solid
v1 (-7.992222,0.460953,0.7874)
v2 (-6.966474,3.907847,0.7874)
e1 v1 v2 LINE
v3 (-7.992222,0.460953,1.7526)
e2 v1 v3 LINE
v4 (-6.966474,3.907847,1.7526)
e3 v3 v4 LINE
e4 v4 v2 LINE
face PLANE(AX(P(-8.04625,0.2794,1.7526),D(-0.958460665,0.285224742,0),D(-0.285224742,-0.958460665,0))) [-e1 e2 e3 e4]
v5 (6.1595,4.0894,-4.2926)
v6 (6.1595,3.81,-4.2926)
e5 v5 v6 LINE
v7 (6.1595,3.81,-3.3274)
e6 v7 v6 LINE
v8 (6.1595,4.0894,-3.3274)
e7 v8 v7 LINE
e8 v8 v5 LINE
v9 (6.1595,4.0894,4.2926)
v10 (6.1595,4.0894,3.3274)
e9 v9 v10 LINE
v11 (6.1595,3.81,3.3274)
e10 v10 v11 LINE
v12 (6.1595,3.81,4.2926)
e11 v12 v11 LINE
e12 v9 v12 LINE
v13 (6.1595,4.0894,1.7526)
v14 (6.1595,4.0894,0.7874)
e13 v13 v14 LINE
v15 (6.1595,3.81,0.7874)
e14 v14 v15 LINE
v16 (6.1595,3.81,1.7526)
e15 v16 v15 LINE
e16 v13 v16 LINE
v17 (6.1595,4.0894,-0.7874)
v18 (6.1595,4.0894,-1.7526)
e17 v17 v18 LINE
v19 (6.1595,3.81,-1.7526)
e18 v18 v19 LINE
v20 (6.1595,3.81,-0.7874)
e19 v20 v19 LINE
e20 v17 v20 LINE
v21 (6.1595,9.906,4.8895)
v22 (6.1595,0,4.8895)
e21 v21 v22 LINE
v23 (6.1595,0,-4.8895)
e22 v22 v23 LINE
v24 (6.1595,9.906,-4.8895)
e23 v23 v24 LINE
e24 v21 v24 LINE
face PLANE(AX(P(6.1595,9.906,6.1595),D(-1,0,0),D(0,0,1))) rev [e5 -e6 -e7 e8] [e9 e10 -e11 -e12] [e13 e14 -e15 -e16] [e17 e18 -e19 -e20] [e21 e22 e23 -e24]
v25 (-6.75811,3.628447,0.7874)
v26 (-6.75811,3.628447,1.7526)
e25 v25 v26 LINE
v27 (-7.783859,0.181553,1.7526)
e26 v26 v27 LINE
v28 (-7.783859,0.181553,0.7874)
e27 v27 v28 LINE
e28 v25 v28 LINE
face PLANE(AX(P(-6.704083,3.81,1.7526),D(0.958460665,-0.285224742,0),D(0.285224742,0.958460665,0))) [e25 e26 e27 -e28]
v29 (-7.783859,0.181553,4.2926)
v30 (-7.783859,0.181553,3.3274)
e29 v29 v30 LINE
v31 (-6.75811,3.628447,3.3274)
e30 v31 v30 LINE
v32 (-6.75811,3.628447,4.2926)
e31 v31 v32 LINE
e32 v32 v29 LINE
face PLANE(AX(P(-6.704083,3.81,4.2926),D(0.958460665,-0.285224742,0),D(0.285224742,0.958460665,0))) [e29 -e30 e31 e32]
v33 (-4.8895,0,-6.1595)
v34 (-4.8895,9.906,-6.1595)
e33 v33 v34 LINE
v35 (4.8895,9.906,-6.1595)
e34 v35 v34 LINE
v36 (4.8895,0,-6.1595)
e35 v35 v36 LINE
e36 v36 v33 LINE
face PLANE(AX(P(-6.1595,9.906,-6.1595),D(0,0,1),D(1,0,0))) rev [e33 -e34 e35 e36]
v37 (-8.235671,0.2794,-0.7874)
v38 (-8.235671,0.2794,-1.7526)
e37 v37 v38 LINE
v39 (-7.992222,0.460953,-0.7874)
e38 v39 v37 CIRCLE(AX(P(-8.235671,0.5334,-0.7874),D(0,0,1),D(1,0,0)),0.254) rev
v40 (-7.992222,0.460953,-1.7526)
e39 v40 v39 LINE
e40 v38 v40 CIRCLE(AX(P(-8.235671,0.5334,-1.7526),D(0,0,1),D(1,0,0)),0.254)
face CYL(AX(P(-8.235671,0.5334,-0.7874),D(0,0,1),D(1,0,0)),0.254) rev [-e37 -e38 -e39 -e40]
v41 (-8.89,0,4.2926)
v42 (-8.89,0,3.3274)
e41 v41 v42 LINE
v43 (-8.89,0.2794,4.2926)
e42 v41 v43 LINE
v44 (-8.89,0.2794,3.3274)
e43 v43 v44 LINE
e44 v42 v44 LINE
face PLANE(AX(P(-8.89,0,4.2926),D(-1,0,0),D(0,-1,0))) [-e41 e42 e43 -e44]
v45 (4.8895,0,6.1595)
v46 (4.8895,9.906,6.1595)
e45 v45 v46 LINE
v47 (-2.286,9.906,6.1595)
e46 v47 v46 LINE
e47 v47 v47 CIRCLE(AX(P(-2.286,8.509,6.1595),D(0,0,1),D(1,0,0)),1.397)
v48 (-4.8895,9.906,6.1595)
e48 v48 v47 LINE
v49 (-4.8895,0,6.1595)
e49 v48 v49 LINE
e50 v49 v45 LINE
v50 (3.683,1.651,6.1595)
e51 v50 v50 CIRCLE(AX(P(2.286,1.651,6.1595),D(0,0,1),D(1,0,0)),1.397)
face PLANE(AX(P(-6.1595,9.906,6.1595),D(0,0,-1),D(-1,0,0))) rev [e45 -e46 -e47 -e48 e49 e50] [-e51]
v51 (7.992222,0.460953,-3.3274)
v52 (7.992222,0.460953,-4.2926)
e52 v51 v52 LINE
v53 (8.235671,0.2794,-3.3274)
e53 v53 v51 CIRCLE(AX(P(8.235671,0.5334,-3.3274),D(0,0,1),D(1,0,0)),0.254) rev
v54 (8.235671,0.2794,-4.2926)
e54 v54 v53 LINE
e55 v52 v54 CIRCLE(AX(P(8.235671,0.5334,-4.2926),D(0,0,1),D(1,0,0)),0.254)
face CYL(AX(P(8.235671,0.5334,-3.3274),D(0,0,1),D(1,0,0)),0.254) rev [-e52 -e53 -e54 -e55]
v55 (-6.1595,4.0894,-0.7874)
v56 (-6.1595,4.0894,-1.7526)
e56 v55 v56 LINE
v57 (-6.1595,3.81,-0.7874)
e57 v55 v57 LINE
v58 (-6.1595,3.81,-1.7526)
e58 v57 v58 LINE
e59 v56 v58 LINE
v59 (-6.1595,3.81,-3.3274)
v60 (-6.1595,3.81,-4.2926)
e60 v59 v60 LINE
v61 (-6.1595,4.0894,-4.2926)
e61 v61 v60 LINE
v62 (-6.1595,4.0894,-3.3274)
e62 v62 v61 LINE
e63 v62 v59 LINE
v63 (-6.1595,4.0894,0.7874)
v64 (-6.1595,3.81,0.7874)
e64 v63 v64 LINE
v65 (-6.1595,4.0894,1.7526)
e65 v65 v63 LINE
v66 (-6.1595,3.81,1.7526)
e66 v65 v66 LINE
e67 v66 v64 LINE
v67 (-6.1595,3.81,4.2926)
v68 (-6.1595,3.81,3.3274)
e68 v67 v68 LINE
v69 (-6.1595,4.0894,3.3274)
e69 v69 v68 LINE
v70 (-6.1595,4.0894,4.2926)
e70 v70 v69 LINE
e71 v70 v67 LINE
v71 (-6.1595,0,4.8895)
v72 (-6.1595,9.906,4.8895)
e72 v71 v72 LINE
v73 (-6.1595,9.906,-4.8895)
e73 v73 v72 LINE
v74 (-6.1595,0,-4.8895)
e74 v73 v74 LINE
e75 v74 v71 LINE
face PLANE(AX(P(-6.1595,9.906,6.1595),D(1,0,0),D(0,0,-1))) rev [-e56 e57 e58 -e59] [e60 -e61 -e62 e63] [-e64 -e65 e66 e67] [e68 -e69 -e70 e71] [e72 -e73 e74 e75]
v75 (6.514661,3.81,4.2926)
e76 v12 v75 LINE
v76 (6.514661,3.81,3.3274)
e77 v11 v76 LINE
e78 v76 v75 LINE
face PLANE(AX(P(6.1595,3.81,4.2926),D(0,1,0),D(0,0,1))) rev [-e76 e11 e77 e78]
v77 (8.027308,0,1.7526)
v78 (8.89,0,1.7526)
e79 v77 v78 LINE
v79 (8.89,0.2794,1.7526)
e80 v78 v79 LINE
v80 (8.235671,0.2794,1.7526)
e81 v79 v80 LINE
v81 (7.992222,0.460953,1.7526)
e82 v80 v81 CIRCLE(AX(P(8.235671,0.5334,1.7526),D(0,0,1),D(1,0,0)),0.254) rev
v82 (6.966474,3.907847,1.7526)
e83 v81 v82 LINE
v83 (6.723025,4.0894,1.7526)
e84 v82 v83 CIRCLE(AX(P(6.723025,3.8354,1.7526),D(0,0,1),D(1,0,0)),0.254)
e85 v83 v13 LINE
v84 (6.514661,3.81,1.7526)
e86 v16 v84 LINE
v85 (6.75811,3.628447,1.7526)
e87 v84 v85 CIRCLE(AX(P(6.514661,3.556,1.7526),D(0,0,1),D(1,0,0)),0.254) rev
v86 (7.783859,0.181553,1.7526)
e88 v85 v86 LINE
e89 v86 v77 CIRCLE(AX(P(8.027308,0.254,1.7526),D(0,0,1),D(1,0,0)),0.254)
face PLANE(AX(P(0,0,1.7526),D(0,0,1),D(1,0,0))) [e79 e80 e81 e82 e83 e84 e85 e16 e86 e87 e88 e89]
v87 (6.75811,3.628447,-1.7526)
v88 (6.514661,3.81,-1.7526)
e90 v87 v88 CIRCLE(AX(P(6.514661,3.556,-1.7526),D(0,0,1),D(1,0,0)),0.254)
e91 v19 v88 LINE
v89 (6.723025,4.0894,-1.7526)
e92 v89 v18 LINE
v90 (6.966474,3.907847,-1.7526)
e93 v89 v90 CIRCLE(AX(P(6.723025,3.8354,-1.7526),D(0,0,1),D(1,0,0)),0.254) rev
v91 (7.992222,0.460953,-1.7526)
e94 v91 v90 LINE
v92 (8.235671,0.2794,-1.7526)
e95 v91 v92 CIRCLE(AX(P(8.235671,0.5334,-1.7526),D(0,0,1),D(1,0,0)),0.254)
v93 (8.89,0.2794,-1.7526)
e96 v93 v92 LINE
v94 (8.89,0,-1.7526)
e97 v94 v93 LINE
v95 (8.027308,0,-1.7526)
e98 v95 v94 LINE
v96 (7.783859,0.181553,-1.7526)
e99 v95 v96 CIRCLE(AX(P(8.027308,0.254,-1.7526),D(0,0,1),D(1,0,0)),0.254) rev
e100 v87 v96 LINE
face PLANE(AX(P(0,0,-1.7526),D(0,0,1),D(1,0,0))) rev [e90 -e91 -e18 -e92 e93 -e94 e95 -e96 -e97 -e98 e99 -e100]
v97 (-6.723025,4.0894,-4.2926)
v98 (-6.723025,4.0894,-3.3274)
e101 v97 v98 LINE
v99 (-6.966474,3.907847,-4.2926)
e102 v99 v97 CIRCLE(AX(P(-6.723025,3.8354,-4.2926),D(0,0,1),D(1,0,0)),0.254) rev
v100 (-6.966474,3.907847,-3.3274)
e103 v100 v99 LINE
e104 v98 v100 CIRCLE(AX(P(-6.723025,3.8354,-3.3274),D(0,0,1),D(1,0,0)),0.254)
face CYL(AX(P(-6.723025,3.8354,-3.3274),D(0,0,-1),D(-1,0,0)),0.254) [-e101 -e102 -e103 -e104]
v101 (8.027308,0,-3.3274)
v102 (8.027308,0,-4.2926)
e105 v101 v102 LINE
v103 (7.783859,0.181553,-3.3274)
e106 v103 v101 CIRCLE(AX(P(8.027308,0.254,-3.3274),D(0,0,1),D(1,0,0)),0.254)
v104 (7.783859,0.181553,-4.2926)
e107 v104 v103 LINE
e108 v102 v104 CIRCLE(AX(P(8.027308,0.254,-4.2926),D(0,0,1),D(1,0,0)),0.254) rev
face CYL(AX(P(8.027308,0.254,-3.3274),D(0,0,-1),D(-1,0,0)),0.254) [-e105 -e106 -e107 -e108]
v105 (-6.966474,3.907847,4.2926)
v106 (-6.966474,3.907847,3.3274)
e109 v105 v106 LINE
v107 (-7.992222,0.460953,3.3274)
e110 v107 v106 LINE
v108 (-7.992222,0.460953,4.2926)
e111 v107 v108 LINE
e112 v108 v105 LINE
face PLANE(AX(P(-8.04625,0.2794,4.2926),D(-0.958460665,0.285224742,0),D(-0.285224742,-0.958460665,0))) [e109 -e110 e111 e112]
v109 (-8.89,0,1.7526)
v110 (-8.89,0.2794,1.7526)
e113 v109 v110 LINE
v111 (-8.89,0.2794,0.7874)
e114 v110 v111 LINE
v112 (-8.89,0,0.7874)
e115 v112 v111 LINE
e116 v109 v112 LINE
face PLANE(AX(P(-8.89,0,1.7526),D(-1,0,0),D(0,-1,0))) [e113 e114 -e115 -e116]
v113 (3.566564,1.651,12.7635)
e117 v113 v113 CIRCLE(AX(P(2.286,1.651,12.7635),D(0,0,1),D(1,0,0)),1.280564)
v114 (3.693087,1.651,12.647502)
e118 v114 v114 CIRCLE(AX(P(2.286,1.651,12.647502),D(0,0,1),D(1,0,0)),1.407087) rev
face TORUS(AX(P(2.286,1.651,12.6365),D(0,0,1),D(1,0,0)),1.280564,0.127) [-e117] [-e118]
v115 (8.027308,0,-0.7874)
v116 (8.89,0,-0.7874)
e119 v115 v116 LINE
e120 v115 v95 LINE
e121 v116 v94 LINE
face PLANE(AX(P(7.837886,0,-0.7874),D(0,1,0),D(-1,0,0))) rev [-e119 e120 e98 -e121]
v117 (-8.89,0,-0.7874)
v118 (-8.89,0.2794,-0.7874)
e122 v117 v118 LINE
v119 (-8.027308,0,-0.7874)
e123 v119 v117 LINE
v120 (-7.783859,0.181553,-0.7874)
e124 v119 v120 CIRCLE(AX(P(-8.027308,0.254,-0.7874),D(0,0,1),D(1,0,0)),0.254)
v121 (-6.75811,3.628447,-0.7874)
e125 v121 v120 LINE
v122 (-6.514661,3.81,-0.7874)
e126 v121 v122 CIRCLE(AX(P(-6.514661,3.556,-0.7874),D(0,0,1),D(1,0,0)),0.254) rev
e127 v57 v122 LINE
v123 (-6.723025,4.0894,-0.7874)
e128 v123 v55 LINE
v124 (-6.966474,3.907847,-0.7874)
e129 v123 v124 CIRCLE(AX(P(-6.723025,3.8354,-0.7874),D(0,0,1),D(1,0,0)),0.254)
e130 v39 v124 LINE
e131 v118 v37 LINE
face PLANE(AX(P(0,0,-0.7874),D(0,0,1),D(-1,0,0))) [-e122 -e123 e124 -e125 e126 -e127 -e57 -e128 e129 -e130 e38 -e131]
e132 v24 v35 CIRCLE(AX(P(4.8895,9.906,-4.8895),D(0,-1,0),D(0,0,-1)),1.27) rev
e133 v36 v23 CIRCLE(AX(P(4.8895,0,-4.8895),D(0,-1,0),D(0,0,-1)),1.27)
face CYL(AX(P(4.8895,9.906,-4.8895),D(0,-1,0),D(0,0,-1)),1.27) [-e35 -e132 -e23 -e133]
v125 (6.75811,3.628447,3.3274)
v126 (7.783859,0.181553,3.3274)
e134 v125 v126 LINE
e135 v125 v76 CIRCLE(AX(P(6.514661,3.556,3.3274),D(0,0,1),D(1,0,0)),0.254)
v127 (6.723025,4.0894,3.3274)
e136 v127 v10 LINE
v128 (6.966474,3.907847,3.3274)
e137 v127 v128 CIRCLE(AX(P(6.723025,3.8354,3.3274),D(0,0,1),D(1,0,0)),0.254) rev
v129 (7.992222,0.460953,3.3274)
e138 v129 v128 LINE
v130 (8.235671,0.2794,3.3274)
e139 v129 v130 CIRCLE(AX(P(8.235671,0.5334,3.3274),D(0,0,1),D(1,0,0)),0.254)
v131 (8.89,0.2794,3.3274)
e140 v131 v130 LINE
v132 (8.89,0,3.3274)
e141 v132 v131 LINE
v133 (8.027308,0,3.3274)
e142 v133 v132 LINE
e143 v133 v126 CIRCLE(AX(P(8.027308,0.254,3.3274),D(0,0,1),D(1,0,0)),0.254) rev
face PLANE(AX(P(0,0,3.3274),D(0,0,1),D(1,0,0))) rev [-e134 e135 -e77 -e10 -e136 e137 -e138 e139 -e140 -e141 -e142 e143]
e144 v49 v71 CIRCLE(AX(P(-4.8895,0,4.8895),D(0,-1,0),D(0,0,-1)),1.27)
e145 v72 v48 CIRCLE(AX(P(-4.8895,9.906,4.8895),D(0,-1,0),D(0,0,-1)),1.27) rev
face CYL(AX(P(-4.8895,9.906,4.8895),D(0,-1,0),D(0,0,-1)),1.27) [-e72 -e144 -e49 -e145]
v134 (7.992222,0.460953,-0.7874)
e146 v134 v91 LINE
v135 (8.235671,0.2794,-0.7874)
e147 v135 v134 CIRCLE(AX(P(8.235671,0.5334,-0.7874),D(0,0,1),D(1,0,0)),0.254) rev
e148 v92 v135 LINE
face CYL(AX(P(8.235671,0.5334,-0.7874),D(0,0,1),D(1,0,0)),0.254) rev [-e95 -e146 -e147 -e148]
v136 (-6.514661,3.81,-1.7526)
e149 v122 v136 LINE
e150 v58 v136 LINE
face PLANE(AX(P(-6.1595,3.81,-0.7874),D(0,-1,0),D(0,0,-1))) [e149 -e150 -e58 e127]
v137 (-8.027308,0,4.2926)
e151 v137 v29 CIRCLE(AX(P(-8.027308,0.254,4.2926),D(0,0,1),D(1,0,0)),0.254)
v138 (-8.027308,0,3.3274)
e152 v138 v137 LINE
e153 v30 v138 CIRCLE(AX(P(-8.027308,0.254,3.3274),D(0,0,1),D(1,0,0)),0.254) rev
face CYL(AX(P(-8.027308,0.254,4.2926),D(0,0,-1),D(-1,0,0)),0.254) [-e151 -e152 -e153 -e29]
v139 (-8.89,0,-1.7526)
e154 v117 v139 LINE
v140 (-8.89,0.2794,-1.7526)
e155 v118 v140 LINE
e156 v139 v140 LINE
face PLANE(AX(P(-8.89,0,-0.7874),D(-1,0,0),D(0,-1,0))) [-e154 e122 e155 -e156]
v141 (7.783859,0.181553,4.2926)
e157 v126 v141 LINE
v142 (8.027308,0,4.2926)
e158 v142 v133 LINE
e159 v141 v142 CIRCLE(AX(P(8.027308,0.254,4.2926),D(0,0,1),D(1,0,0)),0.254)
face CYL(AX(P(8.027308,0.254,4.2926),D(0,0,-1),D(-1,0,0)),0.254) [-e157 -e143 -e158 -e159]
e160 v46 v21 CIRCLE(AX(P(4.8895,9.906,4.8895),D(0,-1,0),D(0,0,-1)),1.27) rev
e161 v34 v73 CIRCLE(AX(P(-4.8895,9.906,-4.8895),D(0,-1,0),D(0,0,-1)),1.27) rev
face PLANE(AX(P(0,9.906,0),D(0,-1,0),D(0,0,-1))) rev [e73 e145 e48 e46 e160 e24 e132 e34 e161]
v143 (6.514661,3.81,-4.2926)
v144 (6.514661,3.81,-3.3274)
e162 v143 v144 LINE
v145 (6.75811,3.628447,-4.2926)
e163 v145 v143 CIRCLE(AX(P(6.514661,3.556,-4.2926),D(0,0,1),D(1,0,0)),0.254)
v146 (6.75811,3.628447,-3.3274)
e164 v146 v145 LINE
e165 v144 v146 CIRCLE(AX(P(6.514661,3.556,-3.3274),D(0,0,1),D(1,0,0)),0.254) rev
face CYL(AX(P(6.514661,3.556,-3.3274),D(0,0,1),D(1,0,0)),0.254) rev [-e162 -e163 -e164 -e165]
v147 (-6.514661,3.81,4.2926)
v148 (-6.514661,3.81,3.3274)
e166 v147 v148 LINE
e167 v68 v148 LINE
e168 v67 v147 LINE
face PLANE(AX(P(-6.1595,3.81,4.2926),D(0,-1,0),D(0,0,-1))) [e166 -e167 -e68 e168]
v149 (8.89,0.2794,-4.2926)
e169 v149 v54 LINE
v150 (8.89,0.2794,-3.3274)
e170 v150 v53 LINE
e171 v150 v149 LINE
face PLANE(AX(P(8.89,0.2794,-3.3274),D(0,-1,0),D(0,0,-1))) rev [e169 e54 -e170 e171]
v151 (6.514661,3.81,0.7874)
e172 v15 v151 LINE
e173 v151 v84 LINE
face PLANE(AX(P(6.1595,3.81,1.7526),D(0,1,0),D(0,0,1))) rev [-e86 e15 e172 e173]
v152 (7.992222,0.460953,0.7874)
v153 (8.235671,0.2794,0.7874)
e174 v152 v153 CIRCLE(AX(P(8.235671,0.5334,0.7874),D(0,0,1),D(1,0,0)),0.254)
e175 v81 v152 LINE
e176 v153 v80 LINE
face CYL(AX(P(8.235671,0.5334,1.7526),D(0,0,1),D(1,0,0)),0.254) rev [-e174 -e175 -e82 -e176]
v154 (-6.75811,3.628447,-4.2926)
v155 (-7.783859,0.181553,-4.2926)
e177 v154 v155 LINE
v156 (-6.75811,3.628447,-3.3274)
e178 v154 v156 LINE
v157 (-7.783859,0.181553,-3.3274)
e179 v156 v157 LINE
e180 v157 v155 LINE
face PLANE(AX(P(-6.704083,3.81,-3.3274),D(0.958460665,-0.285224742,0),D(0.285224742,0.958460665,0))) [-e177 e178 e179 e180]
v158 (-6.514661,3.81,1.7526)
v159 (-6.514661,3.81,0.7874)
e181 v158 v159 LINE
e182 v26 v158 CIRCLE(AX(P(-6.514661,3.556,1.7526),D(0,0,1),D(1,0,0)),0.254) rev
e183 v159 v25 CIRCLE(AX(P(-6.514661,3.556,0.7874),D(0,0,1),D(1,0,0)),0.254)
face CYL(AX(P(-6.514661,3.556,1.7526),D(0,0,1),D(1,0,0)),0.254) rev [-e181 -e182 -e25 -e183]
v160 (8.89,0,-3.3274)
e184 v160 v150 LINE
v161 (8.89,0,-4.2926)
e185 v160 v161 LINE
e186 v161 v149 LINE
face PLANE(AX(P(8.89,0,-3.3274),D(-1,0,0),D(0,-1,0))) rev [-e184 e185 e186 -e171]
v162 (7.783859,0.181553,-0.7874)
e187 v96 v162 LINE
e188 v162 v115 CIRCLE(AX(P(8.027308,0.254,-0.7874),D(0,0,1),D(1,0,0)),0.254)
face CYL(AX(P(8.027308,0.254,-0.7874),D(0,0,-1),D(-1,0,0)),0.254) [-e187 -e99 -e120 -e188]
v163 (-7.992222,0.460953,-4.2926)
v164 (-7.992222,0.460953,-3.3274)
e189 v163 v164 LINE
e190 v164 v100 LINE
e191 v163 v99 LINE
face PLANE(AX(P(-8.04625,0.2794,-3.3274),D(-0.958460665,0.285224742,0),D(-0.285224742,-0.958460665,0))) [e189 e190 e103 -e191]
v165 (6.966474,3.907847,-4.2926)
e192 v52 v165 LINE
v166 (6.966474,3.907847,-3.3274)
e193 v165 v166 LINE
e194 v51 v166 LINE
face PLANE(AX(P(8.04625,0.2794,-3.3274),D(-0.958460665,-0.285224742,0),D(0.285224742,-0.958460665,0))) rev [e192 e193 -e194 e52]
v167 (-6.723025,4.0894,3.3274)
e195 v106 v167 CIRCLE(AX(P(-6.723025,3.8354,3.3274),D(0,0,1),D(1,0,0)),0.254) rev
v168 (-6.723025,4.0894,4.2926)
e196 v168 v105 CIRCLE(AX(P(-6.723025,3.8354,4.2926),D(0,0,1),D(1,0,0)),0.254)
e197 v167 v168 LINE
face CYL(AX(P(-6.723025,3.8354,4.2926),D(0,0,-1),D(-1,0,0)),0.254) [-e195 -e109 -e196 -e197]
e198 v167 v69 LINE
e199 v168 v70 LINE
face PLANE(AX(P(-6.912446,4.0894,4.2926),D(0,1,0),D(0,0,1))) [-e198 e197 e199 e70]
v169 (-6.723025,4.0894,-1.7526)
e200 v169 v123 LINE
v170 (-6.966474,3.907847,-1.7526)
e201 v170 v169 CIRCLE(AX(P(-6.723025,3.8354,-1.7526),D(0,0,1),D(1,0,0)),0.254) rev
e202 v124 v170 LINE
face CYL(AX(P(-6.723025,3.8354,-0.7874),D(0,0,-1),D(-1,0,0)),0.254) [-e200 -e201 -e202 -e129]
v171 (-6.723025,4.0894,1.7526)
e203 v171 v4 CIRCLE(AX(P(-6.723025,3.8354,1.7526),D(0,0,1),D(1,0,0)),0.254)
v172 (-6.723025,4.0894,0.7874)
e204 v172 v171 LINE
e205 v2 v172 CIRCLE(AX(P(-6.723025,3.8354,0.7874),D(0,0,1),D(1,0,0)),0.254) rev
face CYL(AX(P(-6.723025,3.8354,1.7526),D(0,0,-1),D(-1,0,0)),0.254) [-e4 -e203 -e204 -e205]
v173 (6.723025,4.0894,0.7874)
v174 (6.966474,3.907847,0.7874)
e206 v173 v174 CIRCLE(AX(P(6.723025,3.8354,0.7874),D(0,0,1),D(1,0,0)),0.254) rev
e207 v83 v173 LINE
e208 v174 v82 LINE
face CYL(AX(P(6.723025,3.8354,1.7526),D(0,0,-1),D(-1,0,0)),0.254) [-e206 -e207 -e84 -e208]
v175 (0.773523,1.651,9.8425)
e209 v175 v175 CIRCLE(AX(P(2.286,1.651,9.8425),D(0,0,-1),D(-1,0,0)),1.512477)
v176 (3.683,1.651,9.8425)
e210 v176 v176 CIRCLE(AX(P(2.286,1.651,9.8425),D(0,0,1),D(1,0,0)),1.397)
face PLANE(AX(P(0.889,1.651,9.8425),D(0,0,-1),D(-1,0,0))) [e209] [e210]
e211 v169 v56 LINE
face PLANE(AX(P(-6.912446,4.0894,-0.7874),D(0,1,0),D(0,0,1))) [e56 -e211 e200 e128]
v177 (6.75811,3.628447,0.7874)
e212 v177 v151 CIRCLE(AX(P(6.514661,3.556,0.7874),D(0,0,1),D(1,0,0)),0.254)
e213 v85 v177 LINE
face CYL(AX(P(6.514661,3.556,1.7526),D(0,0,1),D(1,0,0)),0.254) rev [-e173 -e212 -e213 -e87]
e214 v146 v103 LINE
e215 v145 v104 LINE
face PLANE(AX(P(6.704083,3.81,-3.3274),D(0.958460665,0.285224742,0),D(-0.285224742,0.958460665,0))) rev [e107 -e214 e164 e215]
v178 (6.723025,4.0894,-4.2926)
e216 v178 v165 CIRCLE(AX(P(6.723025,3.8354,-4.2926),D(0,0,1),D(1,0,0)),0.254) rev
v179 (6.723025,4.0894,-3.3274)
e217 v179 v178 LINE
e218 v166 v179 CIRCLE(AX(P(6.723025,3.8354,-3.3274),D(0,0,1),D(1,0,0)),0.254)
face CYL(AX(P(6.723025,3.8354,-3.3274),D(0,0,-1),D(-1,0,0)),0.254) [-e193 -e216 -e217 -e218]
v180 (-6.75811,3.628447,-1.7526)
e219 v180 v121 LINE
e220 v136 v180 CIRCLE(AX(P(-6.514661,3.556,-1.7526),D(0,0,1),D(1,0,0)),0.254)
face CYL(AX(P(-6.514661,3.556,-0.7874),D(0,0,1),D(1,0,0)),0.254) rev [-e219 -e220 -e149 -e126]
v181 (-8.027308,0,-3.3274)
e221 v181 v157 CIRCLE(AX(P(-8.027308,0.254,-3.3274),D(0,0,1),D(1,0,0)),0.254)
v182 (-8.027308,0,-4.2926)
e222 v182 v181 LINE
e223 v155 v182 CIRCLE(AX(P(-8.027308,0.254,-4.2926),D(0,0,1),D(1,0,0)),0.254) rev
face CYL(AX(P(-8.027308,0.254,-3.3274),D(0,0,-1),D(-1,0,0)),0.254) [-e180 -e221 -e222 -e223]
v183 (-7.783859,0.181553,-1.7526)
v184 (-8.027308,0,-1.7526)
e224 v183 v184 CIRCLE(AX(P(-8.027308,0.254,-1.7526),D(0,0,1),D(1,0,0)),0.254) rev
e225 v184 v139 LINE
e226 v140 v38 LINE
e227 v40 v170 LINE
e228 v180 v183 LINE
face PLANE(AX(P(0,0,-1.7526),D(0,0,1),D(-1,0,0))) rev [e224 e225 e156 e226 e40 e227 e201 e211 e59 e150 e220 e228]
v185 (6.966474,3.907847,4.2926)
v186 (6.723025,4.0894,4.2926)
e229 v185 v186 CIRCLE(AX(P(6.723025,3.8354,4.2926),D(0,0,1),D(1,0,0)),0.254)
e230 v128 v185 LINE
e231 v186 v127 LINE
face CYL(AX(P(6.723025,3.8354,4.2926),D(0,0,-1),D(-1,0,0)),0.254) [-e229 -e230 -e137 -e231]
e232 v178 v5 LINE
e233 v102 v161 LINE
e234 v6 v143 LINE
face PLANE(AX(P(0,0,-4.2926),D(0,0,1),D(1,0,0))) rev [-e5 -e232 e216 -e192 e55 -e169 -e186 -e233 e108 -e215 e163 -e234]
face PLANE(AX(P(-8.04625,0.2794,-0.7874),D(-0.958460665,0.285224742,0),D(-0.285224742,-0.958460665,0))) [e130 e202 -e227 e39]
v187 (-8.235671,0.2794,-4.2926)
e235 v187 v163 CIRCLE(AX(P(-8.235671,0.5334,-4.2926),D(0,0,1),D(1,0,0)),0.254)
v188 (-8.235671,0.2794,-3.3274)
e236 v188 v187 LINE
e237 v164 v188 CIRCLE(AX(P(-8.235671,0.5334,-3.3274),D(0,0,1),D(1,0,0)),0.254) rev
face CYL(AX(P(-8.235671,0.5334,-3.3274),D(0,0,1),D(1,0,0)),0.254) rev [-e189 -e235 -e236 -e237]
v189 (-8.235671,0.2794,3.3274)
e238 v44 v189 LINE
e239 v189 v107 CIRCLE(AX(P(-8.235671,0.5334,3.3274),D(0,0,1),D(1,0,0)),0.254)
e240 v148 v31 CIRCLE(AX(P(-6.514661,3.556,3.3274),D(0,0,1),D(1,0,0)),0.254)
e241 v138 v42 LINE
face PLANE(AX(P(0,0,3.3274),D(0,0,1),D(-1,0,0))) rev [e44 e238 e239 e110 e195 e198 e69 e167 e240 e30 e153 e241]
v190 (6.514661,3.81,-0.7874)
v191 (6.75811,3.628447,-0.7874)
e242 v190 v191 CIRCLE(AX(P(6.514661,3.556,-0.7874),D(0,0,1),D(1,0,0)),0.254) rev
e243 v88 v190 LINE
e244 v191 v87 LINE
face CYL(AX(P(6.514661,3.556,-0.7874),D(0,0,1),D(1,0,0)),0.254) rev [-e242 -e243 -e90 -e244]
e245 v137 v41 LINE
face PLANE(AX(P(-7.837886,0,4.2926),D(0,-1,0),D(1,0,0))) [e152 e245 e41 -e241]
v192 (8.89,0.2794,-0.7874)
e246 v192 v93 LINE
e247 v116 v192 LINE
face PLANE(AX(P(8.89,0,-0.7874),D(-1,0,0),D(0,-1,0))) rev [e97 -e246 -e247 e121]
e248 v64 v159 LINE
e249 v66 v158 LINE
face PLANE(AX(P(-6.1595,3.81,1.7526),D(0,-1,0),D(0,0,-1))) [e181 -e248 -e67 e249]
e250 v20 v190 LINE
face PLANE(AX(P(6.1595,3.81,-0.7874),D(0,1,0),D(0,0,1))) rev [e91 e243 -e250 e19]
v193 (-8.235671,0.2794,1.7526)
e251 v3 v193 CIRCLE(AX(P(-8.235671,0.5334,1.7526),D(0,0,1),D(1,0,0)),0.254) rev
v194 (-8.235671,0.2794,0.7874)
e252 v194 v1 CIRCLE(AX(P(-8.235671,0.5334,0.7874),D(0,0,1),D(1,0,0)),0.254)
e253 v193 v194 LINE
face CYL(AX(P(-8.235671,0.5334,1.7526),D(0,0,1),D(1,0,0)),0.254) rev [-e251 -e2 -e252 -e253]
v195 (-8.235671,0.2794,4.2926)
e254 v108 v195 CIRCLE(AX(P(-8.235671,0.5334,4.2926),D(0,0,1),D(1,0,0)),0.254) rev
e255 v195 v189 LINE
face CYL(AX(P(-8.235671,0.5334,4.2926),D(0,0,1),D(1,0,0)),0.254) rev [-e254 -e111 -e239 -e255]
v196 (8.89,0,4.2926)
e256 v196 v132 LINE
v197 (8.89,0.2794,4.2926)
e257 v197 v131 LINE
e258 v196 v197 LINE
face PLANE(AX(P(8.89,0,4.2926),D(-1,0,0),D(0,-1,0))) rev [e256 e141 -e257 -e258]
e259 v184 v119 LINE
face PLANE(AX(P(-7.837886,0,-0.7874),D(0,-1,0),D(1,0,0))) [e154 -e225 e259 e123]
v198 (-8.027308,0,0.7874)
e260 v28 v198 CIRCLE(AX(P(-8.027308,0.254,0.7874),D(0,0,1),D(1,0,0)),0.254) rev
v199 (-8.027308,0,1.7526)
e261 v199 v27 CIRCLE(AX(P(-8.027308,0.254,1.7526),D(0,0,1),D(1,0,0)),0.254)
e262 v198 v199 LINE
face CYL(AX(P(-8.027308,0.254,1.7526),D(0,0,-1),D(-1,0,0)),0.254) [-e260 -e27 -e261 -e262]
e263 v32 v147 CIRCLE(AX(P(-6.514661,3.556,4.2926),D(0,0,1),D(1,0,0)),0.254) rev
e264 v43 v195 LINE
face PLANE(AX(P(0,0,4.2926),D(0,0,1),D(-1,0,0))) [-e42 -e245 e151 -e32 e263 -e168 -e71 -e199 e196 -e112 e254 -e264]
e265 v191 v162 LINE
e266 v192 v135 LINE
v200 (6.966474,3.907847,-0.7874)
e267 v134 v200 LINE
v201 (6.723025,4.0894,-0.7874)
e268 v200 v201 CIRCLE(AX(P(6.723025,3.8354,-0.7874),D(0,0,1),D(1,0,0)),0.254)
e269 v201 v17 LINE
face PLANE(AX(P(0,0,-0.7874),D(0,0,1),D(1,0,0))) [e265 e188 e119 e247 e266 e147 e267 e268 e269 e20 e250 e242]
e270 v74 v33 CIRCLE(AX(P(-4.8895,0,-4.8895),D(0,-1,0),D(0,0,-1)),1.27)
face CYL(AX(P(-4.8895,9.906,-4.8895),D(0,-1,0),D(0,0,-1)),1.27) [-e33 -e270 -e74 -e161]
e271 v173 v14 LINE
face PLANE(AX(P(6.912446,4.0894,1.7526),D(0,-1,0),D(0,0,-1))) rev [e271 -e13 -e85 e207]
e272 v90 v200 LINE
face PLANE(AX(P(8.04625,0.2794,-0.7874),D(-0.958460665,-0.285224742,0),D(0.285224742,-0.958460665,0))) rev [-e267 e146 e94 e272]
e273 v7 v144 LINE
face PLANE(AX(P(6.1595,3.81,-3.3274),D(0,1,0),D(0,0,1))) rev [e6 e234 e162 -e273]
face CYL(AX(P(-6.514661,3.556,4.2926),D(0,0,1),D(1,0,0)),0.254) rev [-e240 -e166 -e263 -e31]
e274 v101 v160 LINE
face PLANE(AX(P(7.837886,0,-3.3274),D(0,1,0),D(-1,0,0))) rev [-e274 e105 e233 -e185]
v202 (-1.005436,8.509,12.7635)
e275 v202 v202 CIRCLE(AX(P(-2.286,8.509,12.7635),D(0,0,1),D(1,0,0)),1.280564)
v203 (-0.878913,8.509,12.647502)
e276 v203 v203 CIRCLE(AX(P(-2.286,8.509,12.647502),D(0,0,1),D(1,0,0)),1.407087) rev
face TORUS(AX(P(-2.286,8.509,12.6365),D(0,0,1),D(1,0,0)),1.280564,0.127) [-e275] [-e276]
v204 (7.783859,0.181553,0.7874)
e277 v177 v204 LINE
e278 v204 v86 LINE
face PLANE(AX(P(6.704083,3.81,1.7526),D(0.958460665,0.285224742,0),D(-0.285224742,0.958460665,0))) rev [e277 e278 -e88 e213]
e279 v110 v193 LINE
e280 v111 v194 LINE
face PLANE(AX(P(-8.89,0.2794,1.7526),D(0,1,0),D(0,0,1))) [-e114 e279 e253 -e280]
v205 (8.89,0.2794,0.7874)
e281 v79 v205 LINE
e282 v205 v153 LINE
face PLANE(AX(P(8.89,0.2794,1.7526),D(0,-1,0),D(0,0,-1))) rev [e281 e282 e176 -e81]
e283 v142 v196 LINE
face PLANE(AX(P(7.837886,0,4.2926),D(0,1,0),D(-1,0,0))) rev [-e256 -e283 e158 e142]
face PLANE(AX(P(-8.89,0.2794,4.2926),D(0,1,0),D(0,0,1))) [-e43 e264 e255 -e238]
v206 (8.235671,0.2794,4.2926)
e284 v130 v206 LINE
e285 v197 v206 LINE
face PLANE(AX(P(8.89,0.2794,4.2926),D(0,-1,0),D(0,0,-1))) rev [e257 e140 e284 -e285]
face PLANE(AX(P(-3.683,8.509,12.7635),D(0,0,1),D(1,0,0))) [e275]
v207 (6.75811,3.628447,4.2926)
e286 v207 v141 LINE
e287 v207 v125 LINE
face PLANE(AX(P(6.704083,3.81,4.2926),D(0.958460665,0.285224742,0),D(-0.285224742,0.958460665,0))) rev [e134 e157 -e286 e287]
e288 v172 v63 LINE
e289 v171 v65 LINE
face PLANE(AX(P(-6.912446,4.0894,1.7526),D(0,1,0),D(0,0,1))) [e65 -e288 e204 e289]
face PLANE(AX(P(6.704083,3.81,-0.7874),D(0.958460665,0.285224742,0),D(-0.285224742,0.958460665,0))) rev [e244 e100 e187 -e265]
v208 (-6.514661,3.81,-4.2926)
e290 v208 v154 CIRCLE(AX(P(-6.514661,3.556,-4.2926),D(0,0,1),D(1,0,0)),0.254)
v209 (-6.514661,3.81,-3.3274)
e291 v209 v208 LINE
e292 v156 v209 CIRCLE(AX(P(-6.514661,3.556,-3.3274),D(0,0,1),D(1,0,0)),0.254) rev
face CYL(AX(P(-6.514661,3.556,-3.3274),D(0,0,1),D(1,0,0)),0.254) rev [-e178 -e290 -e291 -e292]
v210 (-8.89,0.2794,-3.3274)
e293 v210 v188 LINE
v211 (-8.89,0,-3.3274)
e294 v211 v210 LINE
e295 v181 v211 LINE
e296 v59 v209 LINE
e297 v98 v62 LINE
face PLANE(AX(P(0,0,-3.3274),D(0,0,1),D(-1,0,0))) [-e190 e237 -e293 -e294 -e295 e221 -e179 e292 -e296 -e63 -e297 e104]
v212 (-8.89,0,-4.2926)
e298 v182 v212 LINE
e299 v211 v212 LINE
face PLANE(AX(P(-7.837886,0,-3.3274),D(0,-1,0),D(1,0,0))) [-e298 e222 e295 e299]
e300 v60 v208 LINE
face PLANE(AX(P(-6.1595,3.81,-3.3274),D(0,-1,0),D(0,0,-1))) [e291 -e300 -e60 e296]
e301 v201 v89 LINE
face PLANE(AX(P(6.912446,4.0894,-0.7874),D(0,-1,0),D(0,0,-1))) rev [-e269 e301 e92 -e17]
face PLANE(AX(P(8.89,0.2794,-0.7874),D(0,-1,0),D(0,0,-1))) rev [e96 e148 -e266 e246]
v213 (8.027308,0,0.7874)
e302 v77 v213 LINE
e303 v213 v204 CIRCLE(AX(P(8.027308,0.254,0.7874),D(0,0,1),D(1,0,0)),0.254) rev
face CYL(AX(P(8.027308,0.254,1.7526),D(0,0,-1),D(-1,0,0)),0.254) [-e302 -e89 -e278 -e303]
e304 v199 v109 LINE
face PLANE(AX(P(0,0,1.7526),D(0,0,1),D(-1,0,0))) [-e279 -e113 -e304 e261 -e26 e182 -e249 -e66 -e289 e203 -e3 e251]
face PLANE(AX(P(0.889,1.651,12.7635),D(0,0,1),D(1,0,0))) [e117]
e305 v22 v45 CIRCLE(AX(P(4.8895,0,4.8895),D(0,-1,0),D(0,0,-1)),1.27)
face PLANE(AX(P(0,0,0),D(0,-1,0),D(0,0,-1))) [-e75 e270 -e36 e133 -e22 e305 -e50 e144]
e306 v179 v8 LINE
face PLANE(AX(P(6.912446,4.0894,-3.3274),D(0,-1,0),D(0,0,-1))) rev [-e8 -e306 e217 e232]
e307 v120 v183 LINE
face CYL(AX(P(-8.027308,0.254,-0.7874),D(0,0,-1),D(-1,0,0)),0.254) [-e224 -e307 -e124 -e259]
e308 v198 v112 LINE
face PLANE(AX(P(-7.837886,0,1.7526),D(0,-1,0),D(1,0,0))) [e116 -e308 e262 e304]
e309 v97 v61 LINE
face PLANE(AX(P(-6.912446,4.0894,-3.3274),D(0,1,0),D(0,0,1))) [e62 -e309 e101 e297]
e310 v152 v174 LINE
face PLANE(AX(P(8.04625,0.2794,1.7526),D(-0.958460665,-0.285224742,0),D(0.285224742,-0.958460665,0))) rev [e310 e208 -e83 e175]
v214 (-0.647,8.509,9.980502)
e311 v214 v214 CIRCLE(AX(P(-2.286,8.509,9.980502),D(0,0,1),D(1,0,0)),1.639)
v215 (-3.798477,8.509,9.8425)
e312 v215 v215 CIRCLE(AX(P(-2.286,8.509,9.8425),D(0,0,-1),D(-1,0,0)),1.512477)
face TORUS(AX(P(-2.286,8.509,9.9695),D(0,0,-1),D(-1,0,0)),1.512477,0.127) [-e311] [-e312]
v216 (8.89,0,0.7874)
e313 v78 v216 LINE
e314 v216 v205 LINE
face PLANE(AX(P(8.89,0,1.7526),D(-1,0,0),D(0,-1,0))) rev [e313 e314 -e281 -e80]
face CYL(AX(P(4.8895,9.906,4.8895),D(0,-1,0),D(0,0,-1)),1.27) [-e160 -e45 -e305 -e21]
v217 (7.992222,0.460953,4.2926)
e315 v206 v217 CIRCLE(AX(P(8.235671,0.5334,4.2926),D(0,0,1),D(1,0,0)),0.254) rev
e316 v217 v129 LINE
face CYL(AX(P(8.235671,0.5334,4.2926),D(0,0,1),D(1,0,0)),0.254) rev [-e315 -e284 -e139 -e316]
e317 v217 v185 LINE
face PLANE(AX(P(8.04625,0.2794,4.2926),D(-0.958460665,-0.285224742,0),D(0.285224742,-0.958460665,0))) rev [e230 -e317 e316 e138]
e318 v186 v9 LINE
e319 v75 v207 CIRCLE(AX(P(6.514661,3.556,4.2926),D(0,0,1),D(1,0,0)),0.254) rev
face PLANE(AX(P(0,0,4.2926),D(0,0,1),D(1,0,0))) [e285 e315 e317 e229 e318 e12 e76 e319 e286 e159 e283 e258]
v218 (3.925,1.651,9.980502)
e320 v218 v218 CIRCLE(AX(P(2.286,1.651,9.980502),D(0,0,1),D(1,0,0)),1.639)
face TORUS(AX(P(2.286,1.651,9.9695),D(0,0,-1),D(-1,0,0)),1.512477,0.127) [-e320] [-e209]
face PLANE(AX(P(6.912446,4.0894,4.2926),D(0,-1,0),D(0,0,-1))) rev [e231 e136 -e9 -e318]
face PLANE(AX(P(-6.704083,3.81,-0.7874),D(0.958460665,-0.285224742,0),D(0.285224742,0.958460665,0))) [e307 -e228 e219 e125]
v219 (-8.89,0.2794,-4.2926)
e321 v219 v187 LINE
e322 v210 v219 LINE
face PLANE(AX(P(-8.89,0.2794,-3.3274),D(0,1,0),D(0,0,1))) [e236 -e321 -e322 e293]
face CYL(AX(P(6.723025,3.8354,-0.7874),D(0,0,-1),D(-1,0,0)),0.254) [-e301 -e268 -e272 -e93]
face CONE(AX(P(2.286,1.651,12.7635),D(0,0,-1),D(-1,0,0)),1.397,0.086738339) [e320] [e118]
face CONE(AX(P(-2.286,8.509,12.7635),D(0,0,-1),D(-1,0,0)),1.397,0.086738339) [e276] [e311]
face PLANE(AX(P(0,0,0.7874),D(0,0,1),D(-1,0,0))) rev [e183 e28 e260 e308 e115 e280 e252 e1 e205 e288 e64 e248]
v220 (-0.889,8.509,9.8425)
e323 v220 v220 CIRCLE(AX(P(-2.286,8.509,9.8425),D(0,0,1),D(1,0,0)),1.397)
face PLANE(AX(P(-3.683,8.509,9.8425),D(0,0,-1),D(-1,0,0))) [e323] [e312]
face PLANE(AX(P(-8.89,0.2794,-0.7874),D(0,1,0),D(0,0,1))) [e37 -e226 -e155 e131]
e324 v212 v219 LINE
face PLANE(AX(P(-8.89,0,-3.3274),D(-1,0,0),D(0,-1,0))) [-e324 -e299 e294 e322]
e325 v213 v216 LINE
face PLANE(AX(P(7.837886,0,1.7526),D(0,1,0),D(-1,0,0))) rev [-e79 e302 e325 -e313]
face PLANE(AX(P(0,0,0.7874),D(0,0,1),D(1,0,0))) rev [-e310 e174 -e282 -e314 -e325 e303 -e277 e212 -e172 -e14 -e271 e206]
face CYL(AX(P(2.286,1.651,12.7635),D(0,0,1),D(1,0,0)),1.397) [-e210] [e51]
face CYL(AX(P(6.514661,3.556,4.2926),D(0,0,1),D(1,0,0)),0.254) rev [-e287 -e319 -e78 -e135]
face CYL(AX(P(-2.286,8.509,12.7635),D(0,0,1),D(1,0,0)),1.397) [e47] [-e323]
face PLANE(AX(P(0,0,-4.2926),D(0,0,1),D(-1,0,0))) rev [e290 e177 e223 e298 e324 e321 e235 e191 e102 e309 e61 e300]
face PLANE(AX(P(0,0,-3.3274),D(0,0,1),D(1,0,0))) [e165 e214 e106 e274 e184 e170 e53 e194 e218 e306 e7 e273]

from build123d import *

# Parameters (mm, degrees)
SKETCH1_W              = 12.319
SKETCH1_H              = 12.319
BOSS_EXTRUDE1_DEPTH    = 9.906
FILLET1_R              = 0.127
FILLET2_R              = 1.27
LPATTERN2_COUNT        = 2
LPATTERN2_PITCH        = 4.572
LPATTERN2_COUNT_DIR2   = 2
LPATTERN2_PITCH_DIR2   = 6.858
FILLET1_OF_LPATTERN2_R = 0.127
BOSS_EXTRUDE2_DEPTH    = 0.4826
FILLET3_R              = 0.254
LPATTERN5_COUNT        = 4
LPATTERN5_PITCH        = 2.54
FILLET3_OF_LPATTERN5_R = 0.254
MIRROR1_START          = -4.2926
MIRROR1_DEPTH          = 0.9652
MIRROR1_START_2        = -1.7526
MIRROR1_2_DEPTH        = 0.9652
MIRROR1_START_3        = 0.7874
MIRROR1_3_DEPTH        = 0.9652
MIRROR1_START_4        = 3.3274
MIRROR1_4_DEPTH        = 0.9652


# Read off the part's stored shape, not the designer's step: Mirror1
with BuildPart() as part:
    # Sketch1 → Boss-Extrude1 (new body)
    with BuildSketch(Plane(origin=(0, 0, 0), x_dir=(1, 0, 0), z_dir=(0, 1, 0))):
        Rectangle(SKETCH1_W, SKETCH1_H)
    extrude(amount=BOSS_EXTRUDE1_DEPTH)

    # Sketch3 → Revolve1 (revolve)
    with BuildSketch(Plane.XZ.offset(-8.509), mode=Mode.PRIVATE) as revolve1_sk:
        Polygon((-3.683, 6.1595), (-3.683, 9.8425), (-3.937, 9.8425), (-3.683, 12.7635), (-2.286, 12.7635), (-2.286, 6.1595), align=None)
    revolve1 = revolve(revolve1_sk.sketch.rotate(Axis((-2.286, 8.509, 12.7635), (0, 0, -1)), 180), axis=Axis((-2.286, 8.509, 12.7635), (0, 0, -1)))

    # Fillet1
    fillet1_edges = [part.edges().sort_by_distance(p)[0] for p in [
        (-3.937, 8.509, 9.8425),
        (-3.683, 8.509, 12.7635),
    ]]
    fillet(fillet1_edges, radius=FILLET1_R)

    # Fillet2
    fillet2_edges = [part.edges().sort_by_distance(p)[0] for p in [
        (6.1595, 4.953, 6.1595),
        (-6.1595, 4.953, 6.1595),
        (-6.1595, 4.953, -6.1595),
        (6.1595, 4.953, -6.1595),
    ]]
    fillet(fillet2_edges, radius=FILLET2_R)

    # LPattern2: Revolve1 2 × 2, 2 skipped
    with Locations(*[(i * LPATTERN2_PITCH, -j * LPATTERN2_PITCH_DIR2, 0) for i in range(LPATTERN2_COUNT) for j in range(LPATTERN2_COUNT_DIR2) if (i, j) not in ((0, 0), (0, 1), (1, 0))]):
        add(revolve1)

    # Fillet1 of LPattern2
    fillet1_of_lpattern2_edges = [part.edges().sort_by_distance(p)[0] for p in [
        (0.635, 1.651, 9.8425),
        (0.889, 1.651, 12.7635),
    ]]
    fillet(fillet1_of_lpattern2_edges, radius=FILLET1_OF_LPATTERN2_R)

    # Sketch5 → Boss-Extrude2 (add, symmetric)
    with BuildSketch(Plane(origin=(0, 0, 3.81), x_dir=(0, -1, 0), z_dir=(0, 0, 1))):
        Polygon((-3.81, 6.1595), (-3.81, 6.70408255), (0, 7.837886271), (0, 8.89), (-0.2794, 8.89), (-0.2794, 8.046249759), (-4.0894, 6.912446038), (-4.0894, 6.1595), align=None)
    boss_extrude2 = extrude(amount=BOSS_EXTRUDE2_DEPTH, both=True)

    # Fillet3
    fillet3_edges = [part.edges().sort_by_distance(p)[0] for p in [
        (6.70408255, 3.81, 3.81),
        (7.837886271, 0, 3.81),
        (8.046249759, 0.2794, 3.81),
        (6.912446038, 4.0894, 3.81),
    ]]
    fillet(fillet3_edges, radius=FILLET3_R)

    # LPattern5: Boss-Extrude2 ×4
    with Locations(*[(0, 0, -i * LPATTERN5_PITCH) for i in range(1, LPATTERN5_COUNT)]):
        add(boss_extrude2)

    # Fillet3 of LPattern5
    fillet3_of_lpattern5_edges = [part.edges().sort_by_distance(p)[0] for p in [
        (6.70408255, 3.81, 1.27),
        (7.837886271, 0, 1.27),
        (8.046249759, 0.2794, 1.27),
        (6.912446038, 4.0894, 1.27),
        (6.70408255, 3.81, -1.27),
        (7.837886271, 0, -1.27),
        (8.046249759, 0.2794, -1.27),
        (6.912446038, 4.0894, -1.27),
        (6.70408255, 3.81, -3.81),
        (7.837886271, 0, -3.81),
        (8.046249759, 0.2794, -3.81),
        (6.912446038, 4.0894, -3.81),
    ]]
    fillet(fillet3_of_lpattern5_edges, radius=FILLET3_OF_LPATTERN5_R)

    # Mirror1 outline → Mirror1 (add)
    with BuildSketch(Plane.XY.offset(MIRROR1_START)):
        with BuildLine():
            Line((-8.89, 0.2794), (-8.89, 0))
            Line((-8.89, 0), (-8.027307623, 0))
            ThreePointArc((-8.027307623, 0), (-7.875461582, 0.050385708), (-7.783858614, 0.181552915))
            Line((-7.783858614, 0.181552915), (-6.758110207, 3.628447085))
            ThreePointArc((-6.758110207, 3.628447085), (-6.666507239, 3.759614292), (-6.514661198, 3.81))
            Line((-6.514661198, 3.81), (-6.1595, 3.81))
            Line((-6.1595, 3.81), (-6.1595, 4.0894))
            Line((-6.1595, 4.0894), (-6.723024685, 4.0894))
            ThreePointArc((-6.723024685, 4.0894), (-6.874870727, 4.039014292), (-6.966473694, 3.907847085))
            Line((-6.966473694, 3.907847085), (-7.992222102, 0.460952915))
            ThreePointArc((-7.992222102, 0.460952915), (-8.08382507, 0.329785708), (-8.235671111, 0.2794))
            Line((-8.235671111, 0.2794), (-8.89, 0.2794))
        make_face()
    extrude(amount=MIRROR1_DEPTH)

    # Mirror1 2 outline → Mirror1 2 (add)
    with BuildSketch(Plane.XY.offset(MIRROR1_START_2)):
        with BuildLine():
            Line((-8.89, 0.2794), (-8.89, 0))
            Line((-8.89, 0), (-8.027307623, 0))
            ThreePointArc((-8.027307623, 0), (-7.875461582, 0.050385708), (-7.783858614, 0.181552915))
            Line((-7.783858614, 0.181552915), (-6.758110207, 3.628447085))
            ThreePointArc((-6.758110207, 3.628447085), (-6.666507239, 3.759614292), (-6.514661198, 3.81))
            Line((-6.514661198, 3.81), (-6.1595, 3.81))
            Line((-6.1595, 3.81), (-6.1595, 4.0894))
            Line((-6.1595, 4.0894), (-6.723024685, 4.0894))
            ThreePointArc((-6.723024685, 4.0894), (-6.874870727, 4.039014292), (-6.966473694, 3.907847085))
            Line((-6.966473694, 3.907847085), (-7.992222102, 0.460952915))
            ThreePointArc((-7.992222102, 0.460952915), (-8.08382507, 0.329785708), (-8.235671111, 0.2794))
            Line((-8.235671111, 0.2794), (-8.89, 0.2794))
        make_face()
    extrude(amount=MIRROR1_2_DEPTH)

    # Mirror1 3 outline → Mirror1 3 (add)
    with BuildSketch(Plane.XY.offset(MIRROR1_START_3)):
        with BuildLine():
            Line((-8.89, 0.2794), (-8.89, 0))
            Line((-8.89, 0), (-8.027307623, 0))
            ThreePointArc((-8.027307623, 0), (-7.875461582, 0.050385708), (-7.783858614, 0.181552915))
            Line((-7.783858614, 0.181552915), (-6.758110207, 3.628447085))
            ThreePointArc((-6.758110207, 3.628447085), (-6.666507239, 3.759614292), (-6.514661198, 3.81))
            Line((-6.514661198, 3.81), (-6.1595, 3.81))
            Line((-6.1595, 3.81), (-6.1595, 4.0894))
            Line((-6.1595, 4.0894), (-6.723024685, 4.0894))
            ThreePointArc((-6.723024685, 4.0894), (-6.874870727, 4.039014292), (-6.966473694, 3.907847085))
            Line((-6.966473694, 3.907847085), (-7.992222102, 0.460952915))
            ThreePointArc((-7.992222102, 0.460952915), (-8.08382507, 0.329785708), (-8.235671111, 0.2794))
            Line((-8.235671111, 0.2794), (-8.89, 0.2794))
        make_face()
    extrude(amount=MIRROR1_3_DEPTH)

    # Mirror1 4 outline → Mirror1 4 (add)
    with BuildSketch(Plane.XY.offset(MIRROR1_START_4)):
        with BuildLine():
            Line((-8.89, 0.2794), (-8.89, 0))
            Line((-8.89, 0), (-8.027307623, 0))
            ThreePointArc((-8.027307623, 0), (-7.875461582, 0.050385708), (-7.783858614, 0.181552915))
            Line((-7.783858614, 0.181552915), (-6.758110207, 3.628447085))
            ThreePointArc((-6.758110207, 3.628447085), (-6.666507239, 3.759614292), (-6.514661198, 3.81))
            Line((-6.514661198, 3.81), (-6.1595, 3.81))
            Line((-6.1595, 3.81), (-6.1595, 4.0894))
            Line((-6.1595, 4.0894), (-6.723024685, 4.0894))
            ThreePointArc((-6.723024685, 4.0894), (-6.874870727, 4.039014292), (-6.966473694, 3.907847085))
            Line((-6.966473694, 3.907847085), (-7.992222102, 0.460952915))
            ThreePointArc((-7.992222102, 0.460952915), (-8.08382507, 0.329785708), (-8.235671111, 0.2794))
            Line((-8.235671111, 0.2794), (-8.89, 0.2794))
        make_face()
    extrude(amount=MIRROR1_4_DEPTH)


solid = part.part
